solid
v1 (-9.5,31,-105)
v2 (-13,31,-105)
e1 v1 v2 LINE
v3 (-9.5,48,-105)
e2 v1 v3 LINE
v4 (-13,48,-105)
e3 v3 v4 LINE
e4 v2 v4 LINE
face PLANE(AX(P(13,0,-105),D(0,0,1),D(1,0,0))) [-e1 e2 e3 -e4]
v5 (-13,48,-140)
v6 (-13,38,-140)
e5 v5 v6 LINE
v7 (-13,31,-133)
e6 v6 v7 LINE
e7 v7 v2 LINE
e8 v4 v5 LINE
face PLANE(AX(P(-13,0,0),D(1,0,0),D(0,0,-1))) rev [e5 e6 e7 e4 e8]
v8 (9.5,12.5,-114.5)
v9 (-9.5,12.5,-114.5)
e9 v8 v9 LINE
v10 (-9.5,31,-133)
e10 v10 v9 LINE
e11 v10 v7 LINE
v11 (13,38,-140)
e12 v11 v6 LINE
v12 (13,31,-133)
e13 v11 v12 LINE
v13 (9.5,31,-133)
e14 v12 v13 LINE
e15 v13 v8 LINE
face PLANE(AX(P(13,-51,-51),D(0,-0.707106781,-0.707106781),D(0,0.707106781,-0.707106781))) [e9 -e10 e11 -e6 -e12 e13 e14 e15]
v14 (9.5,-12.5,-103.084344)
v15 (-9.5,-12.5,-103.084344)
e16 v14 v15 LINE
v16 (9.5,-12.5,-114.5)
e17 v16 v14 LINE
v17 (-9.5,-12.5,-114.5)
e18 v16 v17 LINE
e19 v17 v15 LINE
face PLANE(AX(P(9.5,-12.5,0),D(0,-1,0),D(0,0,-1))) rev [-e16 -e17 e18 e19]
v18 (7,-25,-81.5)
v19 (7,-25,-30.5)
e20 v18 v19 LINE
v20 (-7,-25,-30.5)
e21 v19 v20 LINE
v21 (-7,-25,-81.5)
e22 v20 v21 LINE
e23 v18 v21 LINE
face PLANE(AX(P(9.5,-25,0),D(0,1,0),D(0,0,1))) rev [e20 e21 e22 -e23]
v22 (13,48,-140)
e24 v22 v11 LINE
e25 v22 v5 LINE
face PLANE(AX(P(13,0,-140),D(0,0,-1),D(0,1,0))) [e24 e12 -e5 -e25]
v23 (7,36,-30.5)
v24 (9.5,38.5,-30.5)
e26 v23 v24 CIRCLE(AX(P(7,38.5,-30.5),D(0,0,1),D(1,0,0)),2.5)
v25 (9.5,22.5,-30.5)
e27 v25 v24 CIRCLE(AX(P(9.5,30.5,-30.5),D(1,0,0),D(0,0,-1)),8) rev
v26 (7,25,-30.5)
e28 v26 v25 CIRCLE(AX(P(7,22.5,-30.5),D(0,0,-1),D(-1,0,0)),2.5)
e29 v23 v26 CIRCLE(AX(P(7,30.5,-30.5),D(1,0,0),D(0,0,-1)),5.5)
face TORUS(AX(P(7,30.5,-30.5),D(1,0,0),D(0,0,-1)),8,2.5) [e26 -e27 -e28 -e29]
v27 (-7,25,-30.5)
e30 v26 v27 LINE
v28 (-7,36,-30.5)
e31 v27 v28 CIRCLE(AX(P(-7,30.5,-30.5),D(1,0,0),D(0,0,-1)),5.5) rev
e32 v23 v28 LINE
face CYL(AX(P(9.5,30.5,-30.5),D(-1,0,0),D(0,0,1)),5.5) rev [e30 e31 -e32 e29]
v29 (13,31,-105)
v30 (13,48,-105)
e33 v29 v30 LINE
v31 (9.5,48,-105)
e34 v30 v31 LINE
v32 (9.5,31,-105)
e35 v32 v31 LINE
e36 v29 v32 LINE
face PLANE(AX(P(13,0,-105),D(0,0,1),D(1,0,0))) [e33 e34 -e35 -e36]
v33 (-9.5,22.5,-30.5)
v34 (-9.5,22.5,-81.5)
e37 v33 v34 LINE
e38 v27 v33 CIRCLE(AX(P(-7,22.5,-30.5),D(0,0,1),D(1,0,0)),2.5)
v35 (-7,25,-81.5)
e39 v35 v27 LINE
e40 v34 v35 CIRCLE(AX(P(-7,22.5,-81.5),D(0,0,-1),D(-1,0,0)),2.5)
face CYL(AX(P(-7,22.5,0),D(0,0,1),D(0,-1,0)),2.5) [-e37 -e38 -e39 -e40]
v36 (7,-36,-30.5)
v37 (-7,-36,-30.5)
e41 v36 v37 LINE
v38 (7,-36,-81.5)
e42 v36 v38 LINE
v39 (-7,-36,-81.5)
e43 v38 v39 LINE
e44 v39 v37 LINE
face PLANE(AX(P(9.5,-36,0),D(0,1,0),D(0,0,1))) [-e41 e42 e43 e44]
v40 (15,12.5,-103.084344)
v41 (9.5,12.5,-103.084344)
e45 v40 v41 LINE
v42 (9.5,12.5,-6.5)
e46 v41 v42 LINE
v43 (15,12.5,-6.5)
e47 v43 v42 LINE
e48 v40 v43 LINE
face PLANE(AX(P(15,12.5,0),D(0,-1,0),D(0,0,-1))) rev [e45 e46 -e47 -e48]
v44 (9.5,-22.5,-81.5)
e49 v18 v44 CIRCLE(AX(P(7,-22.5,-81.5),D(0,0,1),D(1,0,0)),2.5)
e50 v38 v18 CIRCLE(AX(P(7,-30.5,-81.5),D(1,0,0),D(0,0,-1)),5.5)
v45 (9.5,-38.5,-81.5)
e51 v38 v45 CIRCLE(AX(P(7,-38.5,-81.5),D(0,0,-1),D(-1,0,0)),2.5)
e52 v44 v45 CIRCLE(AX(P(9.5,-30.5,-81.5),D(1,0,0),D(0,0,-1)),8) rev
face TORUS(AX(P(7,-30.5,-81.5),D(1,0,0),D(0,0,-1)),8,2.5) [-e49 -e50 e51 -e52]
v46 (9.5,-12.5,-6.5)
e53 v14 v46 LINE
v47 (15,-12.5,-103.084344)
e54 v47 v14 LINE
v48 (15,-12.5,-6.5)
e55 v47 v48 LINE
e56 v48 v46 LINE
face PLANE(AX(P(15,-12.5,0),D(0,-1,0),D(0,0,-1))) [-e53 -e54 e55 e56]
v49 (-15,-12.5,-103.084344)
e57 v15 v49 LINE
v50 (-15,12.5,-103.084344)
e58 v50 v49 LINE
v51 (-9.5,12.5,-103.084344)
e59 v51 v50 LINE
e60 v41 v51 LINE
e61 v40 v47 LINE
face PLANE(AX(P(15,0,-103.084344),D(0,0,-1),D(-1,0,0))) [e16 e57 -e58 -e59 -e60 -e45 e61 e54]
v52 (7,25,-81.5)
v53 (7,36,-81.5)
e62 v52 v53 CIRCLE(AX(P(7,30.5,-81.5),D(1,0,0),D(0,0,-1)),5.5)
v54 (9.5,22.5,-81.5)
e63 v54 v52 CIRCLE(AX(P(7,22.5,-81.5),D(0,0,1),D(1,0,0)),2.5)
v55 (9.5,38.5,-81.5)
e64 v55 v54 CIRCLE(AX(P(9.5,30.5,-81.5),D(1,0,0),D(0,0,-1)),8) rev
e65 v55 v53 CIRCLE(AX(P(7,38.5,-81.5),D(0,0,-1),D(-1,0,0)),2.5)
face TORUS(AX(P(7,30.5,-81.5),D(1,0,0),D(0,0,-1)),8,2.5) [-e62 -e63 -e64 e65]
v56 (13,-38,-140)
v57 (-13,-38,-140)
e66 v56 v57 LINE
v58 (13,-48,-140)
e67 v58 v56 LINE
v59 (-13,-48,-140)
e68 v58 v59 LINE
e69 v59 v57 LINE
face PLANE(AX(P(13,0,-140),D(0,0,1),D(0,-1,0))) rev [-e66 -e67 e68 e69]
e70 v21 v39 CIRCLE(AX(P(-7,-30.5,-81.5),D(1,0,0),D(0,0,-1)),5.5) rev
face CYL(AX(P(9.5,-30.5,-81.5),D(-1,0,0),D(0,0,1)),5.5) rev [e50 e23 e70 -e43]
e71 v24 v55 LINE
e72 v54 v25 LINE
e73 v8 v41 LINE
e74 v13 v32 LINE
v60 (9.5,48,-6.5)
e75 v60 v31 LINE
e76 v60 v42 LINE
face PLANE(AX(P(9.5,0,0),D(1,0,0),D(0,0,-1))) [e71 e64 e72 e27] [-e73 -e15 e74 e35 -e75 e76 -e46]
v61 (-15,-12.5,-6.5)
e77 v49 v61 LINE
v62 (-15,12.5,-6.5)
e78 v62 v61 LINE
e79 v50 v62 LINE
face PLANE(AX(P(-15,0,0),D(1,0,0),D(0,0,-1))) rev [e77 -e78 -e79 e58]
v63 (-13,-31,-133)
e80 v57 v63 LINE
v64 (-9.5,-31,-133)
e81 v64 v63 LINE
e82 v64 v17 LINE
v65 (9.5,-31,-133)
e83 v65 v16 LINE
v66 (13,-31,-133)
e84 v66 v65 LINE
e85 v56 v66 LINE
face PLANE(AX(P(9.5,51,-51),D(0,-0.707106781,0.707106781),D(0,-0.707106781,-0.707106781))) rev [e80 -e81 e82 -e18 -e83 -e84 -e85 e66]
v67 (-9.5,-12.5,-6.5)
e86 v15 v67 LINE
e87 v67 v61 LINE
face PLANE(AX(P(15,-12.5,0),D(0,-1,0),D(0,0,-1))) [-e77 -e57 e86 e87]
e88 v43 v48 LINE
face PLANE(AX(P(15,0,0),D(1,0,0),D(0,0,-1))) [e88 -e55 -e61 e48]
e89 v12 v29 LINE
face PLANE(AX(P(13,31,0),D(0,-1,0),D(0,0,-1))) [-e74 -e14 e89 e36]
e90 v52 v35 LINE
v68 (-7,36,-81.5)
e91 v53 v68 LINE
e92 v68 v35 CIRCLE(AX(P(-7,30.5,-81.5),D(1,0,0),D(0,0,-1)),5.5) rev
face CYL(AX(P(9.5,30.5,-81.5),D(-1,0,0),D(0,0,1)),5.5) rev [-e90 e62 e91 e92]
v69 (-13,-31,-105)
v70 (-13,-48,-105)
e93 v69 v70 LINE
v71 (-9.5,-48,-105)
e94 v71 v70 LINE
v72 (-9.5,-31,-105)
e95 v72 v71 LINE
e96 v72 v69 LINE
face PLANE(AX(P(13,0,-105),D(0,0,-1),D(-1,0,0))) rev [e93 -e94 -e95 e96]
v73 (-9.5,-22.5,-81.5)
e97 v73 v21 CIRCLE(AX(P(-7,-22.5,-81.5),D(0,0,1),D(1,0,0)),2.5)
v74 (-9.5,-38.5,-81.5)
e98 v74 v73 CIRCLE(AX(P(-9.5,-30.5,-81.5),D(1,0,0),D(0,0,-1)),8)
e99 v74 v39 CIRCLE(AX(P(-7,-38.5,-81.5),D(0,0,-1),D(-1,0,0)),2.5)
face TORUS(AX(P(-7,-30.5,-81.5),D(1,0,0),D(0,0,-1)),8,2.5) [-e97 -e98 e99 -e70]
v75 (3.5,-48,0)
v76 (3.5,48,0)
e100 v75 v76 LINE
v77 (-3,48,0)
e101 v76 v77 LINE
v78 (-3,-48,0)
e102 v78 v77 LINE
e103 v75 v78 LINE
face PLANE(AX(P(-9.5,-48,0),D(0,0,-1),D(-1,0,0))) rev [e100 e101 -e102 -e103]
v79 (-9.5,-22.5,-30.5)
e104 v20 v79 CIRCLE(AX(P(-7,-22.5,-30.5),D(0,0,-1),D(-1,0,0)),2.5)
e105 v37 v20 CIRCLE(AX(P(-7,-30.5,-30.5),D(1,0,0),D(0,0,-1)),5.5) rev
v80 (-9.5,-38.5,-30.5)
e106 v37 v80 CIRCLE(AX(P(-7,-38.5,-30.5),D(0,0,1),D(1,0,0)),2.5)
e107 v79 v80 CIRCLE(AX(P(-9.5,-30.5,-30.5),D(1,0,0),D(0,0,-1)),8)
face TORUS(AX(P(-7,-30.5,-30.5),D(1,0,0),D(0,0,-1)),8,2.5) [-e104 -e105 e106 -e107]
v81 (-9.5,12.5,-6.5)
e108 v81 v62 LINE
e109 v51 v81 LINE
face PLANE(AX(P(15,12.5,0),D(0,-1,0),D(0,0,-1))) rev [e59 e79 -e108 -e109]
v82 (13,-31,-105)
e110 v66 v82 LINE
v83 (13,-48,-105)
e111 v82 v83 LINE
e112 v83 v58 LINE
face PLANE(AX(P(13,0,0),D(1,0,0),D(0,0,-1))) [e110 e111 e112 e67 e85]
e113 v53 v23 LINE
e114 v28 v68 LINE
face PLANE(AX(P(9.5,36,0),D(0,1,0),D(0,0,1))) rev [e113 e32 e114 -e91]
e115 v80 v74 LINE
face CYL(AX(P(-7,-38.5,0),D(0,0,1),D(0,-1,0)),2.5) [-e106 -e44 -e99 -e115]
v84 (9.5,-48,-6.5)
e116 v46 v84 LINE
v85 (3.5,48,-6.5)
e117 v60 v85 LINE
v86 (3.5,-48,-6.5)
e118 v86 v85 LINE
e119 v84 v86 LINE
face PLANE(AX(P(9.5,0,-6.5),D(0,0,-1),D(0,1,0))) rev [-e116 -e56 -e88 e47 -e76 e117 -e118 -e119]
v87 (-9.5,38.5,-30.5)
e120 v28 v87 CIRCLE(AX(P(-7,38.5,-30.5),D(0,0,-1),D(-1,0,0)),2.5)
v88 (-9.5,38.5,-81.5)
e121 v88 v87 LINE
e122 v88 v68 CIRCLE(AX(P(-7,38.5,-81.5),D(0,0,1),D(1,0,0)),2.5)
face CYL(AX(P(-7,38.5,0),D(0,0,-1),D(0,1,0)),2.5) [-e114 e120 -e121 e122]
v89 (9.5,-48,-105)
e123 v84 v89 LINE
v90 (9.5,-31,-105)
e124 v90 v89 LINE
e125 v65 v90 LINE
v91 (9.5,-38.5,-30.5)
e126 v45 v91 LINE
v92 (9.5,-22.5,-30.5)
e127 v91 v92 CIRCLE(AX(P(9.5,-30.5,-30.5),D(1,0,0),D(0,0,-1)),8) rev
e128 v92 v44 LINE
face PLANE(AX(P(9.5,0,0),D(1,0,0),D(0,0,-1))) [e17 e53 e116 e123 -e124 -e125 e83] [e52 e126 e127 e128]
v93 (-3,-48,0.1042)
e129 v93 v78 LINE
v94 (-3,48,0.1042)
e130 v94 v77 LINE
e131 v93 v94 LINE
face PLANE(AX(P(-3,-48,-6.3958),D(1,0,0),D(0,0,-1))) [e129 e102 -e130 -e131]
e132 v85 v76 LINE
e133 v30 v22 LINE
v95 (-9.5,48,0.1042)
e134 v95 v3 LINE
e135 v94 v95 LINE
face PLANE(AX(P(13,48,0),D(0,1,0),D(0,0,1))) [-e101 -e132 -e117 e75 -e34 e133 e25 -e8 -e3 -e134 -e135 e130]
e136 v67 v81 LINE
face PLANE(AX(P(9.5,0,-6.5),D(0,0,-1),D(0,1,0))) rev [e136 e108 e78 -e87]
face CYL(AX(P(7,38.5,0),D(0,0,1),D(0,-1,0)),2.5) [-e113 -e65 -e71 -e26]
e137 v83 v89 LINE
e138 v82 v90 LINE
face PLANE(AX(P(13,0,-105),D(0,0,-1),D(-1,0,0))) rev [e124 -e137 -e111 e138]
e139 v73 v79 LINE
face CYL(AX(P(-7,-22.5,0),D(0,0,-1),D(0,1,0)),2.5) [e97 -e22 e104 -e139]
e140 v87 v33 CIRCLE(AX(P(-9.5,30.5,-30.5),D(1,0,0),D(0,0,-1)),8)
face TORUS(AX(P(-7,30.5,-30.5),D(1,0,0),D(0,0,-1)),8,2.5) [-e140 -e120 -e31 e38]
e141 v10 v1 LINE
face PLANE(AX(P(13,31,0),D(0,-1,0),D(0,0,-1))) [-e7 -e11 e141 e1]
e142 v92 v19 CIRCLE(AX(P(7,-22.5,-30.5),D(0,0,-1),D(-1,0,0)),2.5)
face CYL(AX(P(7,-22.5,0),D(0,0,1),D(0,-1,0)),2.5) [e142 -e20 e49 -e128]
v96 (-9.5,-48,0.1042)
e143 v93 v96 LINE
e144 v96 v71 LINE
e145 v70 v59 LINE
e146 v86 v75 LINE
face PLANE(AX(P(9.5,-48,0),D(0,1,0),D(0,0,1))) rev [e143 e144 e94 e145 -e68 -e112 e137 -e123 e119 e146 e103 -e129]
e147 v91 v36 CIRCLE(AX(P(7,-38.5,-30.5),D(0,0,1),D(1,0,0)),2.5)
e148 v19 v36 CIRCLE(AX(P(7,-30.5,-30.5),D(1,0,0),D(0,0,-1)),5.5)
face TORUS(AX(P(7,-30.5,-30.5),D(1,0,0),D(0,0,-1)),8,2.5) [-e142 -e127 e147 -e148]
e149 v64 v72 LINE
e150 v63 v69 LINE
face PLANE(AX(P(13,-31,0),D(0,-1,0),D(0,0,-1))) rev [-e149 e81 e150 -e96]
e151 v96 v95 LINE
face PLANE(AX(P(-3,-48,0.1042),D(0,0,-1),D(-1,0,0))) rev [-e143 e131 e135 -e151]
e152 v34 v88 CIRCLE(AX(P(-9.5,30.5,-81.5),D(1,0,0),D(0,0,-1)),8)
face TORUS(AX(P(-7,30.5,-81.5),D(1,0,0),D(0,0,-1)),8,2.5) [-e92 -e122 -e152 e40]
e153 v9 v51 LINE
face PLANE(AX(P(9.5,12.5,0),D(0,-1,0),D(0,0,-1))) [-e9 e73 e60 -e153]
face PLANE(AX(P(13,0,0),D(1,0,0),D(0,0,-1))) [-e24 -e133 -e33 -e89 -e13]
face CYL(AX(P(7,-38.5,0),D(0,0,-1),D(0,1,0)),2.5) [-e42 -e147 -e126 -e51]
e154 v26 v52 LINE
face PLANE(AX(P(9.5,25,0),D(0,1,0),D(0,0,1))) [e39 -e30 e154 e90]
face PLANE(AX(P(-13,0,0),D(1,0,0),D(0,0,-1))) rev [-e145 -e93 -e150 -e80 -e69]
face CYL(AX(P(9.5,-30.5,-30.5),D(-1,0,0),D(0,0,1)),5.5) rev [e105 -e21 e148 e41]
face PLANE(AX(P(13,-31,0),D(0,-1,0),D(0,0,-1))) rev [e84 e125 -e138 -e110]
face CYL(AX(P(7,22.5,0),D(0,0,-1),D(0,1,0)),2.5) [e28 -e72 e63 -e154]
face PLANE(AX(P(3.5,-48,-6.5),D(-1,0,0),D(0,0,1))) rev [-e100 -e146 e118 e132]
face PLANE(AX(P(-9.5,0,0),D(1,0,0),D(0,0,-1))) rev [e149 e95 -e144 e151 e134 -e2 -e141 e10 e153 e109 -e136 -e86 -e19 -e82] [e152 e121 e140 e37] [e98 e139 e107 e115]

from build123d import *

# Parameters (mm, degrees)
BOSS_EXTRUDE8_DEPTH   = 13
BOSS_EXTRUDE8_2_DEPTH = 13
SKETCH1_14_W          = 96.584344236
SKETCH1_14_H          = 25
BOSS_EXTRUDE9_DEPTH   = 15
BOSS_EXTRUDE10_DEPTH  = 9.5
EXTRUDE_THIN3_START   = -96
EXTRUDE_THIN3_DEPTH   = 96
FILLET1_R             = 2.5


# Read off the part's stored shape, not the designer's step: Extrude-Thin3
with BuildPart() as part:
    # Sketch1 → Boss-Extrude8 (new, symmetric)
    with BuildSketch(Plane(origin=(0, 0, 0), x_dir=(0, 0, -1), z_dir=(1, 0, 0))):
        Polygon((140, 48), (105, 48), (105, 31), (133, 31), (140, 38), align=None)
    extrude(amount=BOSS_EXTRUDE8_DEPTH, both=True)



with BuildPart() as body_2:
    # Sketch1 → Boss-Extrude8 2 (new, symmetric)
    with BuildSketch(Plane(origin=(0, 0, 0), x_dir=(0, 0, -1), z_dir=(1, 0, 0))):
        Polygon((105, -31), (105, -48), (140, -48), (140, -38), (133, -31), align=None)
    extrude(amount=BOSS_EXTRUDE8_2_DEPTH, both=True)


with BuildPart() as body_3:
    # Sketch1<14> → Boss-Extrude9 (new, symmetric)
    with BuildSketch(Plane(origin=(0, 0, 0), x_dir=(0, 0, -1), z_dir=(1, 0, 0))):
        with Locations((54.792172118, 0)):
            Rectangle(SKETCH1_14_W, SKETCH1_14_H)
    extrude(amount=BOSS_EXTRUDE9_DEPTH, both=True)


with BuildPart() as part_1:
    add(part.part)

    add(body_2.part)  # Boss-Extrude10 merges body 2

    add(body_3.part)  # Boss-Extrude10 merges body 3
    # Sketch1<15> → Boss-Extrude10 (add, symmetric)
    # profile 1 of 2: a face of its own
    with BuildSketch(Plane(origin=(0, 0, 0), x_dir=(0, 0, -1), z_dir=(1, 0, 0))):
        Polygon((6.5, 48), (6.5, 12.5), (103.084344236, 12.5), (114.5, 12.5), (133, 31), (105, 31), (105, 48), align=None)
        with BuildLine():
            ThreePointArc((30.5, 25), (25, 30.5), (30.5, 36))
            Line((30.5, 36), (81.5, 36))
            ThreePointArc((81.5, 36), (87, 30.5), (81.5, 25))
            Line((81.5, 25), (30.5, 25))
        make_face(mode=Mode.SUBTRACT)
    # profile 2 of 2: a face of its own
    with BuildSketch(Plane(origin=(0, 0, 0), x_dir=(0, 0, -1), z_dir=(1, 0, 0))):
        Polygon((6.5, -12.5), (6.5, -48), (105, -48), (105, -31), (133, -31), (114.5, -12.5), (103.084344236, -12.5), align=None)
        with BuildLine():
            Line((81.5, -36), (30.5, -36))
            ThreePointArc((30.5, -36), (25, -30.5), (30.5, -25))
            Line((30.5, -25), (81.5, -25))
            ThreePointArc((81.5, -25), (87, -30.5), (81.5, -36))
        make_face(mode=Mode.SUBTRACT)
    extrude(amount=BOSS_EXTRUDE10_DEPTH, both=True)

    # Extrude-Thin3 outline → Extrude-Thin3 (add)
    with BuildSketch(Plane(origin=(0, 48, 0), x_dir=(1, 0, 0), z_dir=(0, 1, 0)).offset(EXTRUDE_THIN3_START)):
        Polygon((-9.5, -0.104199667), (-3, -0.104199667), (-3, 0), (3.5, 0), (3.5, 6.5), (-9.5, 6.5), align=None)
    extrude(amount=EXTRUDE_THIN3_DEPTH)

    # Fillet1
    fillet1_edges = [part_1.edges().sort_by_distance(p)[0] for p in [
        (9.5, 30.5, -87),
        (9.5, 25, -56),
        (9.5, 30.5, -25),
        (-9.5, 36, -56),
        (9.5, 36, -56),
        (-9.5, 30.5, -87),
        (-9.5, 30.5, -25),
        (-9.5, 25, -56),
        (-9.5, -25, -56),
        (-9.5, -30.5, -87),
        (9.5, -36, -56),
        (-9.5, -30.5, -25),
        (9.5, -25, -56),
        (9.5, -30.5, -87),
        (9.5, -30.5, -25),
        (-9.5, -36, -56),
    ]]
    fillet(fillet1_edges, radius=FILLET1_R)


solid = part_1.part
